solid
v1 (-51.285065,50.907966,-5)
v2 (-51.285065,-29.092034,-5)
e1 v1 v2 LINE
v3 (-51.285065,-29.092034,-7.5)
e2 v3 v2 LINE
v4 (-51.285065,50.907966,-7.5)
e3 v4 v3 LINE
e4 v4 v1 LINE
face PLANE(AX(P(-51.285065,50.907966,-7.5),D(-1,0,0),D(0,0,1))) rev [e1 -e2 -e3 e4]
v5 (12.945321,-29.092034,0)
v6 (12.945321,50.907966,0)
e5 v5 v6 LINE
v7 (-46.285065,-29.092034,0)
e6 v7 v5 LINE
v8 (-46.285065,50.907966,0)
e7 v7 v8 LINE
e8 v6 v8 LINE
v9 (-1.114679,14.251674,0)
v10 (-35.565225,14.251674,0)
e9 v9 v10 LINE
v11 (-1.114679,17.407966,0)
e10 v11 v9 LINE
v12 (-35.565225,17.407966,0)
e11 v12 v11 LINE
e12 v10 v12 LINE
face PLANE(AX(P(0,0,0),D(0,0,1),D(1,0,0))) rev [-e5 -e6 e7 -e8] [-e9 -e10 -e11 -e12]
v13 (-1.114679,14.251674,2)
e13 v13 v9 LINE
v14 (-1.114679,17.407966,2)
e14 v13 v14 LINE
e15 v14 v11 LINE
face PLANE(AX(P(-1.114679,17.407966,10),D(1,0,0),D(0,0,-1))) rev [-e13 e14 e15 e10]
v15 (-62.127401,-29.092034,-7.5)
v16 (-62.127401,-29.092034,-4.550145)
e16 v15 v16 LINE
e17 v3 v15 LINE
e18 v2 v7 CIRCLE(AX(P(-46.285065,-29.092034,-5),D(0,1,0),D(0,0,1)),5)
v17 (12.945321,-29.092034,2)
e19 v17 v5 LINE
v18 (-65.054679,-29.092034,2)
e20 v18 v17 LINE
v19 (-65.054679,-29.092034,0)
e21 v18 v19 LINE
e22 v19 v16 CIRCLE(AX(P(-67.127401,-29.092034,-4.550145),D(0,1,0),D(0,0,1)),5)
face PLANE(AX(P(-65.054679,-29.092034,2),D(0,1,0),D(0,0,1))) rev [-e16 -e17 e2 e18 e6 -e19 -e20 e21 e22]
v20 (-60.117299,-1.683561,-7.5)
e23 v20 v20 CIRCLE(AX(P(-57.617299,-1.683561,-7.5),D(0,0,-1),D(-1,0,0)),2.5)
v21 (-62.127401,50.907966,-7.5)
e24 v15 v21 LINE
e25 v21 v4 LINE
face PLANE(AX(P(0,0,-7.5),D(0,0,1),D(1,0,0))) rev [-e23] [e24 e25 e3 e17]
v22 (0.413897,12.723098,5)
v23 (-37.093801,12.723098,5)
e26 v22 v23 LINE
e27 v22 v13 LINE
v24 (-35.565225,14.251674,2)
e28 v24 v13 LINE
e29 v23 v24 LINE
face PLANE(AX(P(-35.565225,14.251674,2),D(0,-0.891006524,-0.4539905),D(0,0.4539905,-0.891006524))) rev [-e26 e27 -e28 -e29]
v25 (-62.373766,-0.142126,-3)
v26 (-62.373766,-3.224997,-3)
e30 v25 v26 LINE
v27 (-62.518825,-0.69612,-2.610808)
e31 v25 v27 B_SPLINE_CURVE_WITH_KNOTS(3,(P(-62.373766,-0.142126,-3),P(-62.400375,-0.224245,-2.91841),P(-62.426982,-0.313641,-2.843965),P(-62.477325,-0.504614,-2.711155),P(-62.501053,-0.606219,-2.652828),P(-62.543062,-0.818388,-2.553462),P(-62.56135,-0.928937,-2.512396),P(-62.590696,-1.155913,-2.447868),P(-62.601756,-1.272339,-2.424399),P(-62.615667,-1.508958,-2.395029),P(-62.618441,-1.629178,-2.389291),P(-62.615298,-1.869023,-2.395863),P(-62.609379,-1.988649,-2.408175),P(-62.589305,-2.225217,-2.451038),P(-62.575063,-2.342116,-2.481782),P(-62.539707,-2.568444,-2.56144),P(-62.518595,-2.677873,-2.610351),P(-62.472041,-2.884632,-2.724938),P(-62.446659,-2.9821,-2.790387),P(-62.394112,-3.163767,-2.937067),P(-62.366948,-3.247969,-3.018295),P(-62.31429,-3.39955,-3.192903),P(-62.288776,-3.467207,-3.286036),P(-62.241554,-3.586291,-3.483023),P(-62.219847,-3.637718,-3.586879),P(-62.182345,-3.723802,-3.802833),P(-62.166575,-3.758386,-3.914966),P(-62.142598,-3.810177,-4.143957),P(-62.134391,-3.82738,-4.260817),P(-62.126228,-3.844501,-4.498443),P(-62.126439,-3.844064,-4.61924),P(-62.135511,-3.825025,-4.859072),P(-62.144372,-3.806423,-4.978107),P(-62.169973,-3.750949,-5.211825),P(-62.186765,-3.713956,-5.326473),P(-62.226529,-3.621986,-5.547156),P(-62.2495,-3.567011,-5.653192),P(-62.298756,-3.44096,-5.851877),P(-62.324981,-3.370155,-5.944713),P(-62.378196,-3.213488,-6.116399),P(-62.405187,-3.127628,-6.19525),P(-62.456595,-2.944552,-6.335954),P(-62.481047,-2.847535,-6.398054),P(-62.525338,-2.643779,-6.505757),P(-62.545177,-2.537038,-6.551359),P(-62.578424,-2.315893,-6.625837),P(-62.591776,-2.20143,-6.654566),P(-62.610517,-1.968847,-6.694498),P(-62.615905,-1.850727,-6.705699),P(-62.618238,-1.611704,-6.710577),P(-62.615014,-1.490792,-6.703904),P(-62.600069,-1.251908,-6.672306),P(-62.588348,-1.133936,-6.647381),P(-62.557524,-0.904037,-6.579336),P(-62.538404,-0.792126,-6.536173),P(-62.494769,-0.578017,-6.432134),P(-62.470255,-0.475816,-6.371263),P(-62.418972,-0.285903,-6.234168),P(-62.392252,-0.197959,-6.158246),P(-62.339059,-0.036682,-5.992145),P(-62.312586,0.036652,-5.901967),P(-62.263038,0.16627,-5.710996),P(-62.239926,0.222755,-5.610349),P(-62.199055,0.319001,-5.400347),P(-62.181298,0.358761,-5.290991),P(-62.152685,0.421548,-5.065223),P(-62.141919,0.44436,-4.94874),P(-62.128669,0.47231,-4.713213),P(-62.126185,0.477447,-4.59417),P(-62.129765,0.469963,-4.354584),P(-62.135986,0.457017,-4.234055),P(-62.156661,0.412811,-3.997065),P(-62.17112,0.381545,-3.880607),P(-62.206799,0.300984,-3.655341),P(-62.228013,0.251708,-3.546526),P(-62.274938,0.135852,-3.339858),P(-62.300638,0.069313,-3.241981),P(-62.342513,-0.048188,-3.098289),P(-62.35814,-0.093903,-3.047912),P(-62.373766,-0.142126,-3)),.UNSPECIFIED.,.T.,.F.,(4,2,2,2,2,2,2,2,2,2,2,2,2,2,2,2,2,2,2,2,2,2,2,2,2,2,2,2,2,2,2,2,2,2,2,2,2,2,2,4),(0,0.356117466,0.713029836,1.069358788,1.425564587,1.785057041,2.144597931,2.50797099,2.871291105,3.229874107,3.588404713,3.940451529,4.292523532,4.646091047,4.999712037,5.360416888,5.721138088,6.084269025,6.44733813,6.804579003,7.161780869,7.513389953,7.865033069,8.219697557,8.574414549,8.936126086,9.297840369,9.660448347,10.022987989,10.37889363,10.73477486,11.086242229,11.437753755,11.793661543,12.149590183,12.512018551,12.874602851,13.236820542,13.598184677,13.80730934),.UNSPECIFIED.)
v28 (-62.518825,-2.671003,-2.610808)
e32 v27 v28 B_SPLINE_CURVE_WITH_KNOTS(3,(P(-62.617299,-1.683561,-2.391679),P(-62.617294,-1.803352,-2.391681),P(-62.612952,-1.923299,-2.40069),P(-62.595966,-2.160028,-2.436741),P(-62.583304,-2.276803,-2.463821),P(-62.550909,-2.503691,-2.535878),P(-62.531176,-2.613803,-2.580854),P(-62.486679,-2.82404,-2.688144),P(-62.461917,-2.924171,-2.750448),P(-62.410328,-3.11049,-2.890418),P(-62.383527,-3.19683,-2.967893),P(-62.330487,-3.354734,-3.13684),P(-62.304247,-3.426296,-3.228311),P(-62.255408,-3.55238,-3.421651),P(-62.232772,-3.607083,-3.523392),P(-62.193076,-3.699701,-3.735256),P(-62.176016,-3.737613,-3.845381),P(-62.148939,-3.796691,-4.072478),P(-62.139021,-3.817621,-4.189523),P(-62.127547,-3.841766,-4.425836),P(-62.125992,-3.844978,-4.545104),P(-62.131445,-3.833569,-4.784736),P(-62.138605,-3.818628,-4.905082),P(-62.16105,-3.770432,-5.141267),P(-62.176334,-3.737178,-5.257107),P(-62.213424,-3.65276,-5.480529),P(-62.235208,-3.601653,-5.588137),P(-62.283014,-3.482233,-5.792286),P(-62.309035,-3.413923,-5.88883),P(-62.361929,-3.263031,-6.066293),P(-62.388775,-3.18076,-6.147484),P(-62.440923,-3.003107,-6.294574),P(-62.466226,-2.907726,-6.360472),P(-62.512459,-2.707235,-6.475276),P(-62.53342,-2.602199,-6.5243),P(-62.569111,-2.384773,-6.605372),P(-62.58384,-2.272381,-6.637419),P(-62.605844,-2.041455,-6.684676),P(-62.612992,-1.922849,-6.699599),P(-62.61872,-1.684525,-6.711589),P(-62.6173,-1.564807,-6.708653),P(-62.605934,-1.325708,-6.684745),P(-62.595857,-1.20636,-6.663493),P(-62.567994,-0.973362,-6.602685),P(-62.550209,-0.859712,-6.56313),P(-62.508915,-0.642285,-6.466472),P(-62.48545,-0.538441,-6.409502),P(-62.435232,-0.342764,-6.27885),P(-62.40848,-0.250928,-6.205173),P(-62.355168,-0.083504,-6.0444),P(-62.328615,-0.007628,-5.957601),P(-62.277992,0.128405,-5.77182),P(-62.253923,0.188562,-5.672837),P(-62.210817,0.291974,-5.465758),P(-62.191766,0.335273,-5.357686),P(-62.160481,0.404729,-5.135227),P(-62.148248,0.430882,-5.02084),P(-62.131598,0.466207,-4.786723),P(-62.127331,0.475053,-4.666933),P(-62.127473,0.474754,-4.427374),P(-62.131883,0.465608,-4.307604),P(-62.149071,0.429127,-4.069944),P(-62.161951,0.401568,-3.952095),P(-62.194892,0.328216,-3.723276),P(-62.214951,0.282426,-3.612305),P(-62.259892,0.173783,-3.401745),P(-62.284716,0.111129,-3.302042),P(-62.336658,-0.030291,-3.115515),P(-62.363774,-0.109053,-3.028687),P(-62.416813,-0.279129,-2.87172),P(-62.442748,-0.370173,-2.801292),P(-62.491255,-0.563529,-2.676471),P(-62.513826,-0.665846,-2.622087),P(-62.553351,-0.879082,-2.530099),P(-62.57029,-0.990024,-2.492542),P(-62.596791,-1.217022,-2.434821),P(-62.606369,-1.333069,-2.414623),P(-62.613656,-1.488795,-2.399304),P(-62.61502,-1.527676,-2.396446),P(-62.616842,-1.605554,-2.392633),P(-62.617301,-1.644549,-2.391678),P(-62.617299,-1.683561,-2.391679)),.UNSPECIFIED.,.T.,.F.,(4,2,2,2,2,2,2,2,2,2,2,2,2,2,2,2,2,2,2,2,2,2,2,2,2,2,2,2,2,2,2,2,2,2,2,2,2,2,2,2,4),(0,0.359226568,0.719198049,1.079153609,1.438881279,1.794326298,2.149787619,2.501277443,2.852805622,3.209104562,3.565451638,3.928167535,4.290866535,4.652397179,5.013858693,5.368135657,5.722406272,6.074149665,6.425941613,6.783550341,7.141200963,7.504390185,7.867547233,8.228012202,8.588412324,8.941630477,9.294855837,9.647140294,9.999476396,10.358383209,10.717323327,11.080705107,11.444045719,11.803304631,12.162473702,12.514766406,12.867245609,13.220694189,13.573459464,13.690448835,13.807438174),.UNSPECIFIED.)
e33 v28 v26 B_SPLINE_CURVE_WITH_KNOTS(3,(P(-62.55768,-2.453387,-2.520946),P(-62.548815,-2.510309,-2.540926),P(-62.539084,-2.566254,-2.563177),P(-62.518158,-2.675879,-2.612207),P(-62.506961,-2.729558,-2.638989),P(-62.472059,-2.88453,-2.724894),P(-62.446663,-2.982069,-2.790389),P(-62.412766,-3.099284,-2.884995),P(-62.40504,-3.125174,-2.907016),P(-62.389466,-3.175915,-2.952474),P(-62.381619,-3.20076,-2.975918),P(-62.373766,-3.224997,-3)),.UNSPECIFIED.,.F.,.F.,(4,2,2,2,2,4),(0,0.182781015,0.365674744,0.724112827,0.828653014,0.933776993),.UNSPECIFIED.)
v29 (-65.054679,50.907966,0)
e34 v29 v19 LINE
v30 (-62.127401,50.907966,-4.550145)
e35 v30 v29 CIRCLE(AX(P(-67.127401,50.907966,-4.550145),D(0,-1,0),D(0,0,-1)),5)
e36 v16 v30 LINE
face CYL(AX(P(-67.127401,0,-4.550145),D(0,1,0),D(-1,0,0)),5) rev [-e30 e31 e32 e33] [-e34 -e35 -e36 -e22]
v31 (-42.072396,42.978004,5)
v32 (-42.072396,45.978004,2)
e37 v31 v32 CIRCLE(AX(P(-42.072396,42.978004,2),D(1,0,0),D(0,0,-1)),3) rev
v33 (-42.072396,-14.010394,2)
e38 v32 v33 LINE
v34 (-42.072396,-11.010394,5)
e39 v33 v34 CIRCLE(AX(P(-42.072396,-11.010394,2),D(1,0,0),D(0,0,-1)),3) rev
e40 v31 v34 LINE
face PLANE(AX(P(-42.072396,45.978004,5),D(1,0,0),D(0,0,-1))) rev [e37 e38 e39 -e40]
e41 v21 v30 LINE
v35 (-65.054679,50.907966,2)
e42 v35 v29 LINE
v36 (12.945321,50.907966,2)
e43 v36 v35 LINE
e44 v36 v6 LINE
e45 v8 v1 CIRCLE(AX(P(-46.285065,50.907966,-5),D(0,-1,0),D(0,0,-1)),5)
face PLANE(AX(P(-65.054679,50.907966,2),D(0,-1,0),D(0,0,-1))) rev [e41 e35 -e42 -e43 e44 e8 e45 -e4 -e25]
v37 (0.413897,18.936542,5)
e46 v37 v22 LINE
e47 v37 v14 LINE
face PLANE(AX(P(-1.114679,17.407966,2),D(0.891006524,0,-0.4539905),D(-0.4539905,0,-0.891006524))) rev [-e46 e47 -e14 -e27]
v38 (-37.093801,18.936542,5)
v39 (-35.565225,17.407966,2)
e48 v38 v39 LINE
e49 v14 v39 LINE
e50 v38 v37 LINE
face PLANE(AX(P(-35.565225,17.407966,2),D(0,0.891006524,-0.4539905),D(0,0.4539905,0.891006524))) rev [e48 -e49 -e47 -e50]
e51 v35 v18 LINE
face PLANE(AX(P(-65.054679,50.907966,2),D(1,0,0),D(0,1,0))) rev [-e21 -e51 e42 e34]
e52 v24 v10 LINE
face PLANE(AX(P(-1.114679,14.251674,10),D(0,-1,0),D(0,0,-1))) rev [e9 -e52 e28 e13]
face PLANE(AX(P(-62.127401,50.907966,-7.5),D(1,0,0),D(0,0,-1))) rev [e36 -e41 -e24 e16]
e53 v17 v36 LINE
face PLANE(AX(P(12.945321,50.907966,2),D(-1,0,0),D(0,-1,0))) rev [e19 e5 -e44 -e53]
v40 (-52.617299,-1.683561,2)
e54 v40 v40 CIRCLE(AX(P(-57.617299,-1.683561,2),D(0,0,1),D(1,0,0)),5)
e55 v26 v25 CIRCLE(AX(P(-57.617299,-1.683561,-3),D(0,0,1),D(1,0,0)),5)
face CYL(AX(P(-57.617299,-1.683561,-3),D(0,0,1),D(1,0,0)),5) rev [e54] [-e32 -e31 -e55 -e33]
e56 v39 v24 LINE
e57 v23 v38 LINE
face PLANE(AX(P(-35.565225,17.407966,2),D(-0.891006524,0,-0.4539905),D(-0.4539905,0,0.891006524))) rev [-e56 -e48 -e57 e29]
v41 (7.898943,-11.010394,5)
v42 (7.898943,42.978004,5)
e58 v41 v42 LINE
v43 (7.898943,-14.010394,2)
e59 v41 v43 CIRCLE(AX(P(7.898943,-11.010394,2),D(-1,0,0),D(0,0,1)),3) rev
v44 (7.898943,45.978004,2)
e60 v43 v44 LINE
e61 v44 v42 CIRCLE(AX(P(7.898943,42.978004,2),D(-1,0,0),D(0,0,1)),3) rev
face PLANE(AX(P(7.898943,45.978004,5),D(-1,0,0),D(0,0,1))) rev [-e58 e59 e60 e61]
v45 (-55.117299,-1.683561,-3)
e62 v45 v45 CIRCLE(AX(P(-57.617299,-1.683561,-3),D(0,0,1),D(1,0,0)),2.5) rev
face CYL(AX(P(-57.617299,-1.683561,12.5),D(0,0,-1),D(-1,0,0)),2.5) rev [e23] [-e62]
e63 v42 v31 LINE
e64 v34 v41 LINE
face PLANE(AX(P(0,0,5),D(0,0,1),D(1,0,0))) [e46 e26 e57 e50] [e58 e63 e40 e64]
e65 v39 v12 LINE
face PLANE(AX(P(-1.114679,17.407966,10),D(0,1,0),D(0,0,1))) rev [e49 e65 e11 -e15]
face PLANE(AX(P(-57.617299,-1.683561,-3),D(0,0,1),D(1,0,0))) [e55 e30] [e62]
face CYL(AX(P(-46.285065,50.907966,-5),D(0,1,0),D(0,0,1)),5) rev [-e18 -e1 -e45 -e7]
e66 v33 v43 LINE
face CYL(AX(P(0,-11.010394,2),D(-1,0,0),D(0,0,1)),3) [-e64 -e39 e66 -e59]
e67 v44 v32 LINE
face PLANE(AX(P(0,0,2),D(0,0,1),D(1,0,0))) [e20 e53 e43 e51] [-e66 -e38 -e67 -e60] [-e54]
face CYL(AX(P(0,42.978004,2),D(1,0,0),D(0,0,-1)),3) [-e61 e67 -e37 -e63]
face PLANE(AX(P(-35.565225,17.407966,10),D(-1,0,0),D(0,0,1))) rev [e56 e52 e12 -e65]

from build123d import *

# Parameters (mm, degrees)
SKETCH1_W           = 78
SKETCH1_H           = 80
BOSS_EXTRUDE1_DEPTH = 2
SKETCH2_W           = 34.450546123
SKETCH2_H           = 3.156291742
CUT_EXTRUDE1_DEPTH  = 10
SKETCH3_W           = 10.842335807
SKETCH3_H           = 80
BOSS_EXTRUDE2_DEPTH = 7.5
SKETCH4_R           = 2.5
CUT_EXTRUDE2_DEPTH  = 20
SKETCH5_R           = 5
CUT_EXTRUDE3_DEPTH  = 5
FILLET1_R           = 5
SKETCH8_W           = 49.971339188
SKETCH8_H           = 59.988397901
BOSS_EXTRUDE3_DEPTH = 3
FILLET3_R           = 3
SKETCH9_W           = 34.450546123
SKETCH9_H           = 3.156291742
CUT_EXTRUDE4_DEPTH  = 3
CUT_EXTRUDE4_DRAFT  = 27


# Some blends are built 0.0001 mm under size
with BuildPart() as part:
    # Sketch1 → Boss-Extrude1 (new body)
    with BuildSketch(Plane.XY):
        with Locations((-26.054678924, 10.907965965)):
            Rectangle(SKETCH1_W, SKETCH1_H)
    extrude(amount=BOSS_EXTRUDE1_DEPTH)

    # Sketch2 → Cut-Extrude1 (cut)
    with BuildSketch(Plane(origin=(0, 0, 0), x_dir=(-1, 0, 0), z_dir=(0, 0, -1))):
        with Locations((18.339951986, 15.829820094)):
            Rectangle(SKETCH2_W, SKETCH2_H)
    extrude(amount=-CUT_EXTRUDE1_DEPTH, mode=Mode.SUBTRACT)

    # Sketch3 → Boss-Extrude2 (add)
    with BuildSketch(Plane(origin=(0, 0, 0), x_dir=(-1, 0, 0), z_dir=(0, 0, -1))):
        with Locations((56.706233252, 10.907965965)):
            Rectangle(SKETCH3_W, SKETCH3_H)
    extrude(amount=BOSS_EXTRUDE2_DEPTH)

    # Sketch4 → Cut-Extrude2 (cut)
    with BuildSketch(Plane(origin=(0, 0, -7.5), x_dir=(-1, 0, 0), z_dir=(0, 0, -1))):
        with Locations((57.617298924, -1.683561388)):
            Circle(SKETCH4_R)
    extrude(amount=-CUT_EXTRUDE2_DEPTH, mode=Mode.SUBTRACT)

    # Sketch5 → Cut-Extrude3 (cut)
    with BuildSketch(Plane.XY.offset(2)):
        with Locations((-57.617298924, -1.683561388)):
            Circle(SKETCH5_R)
    extrude(amount=-CUT_EXTRUDE3_DEPTH, mode=Mode.SUBTRACT)

    # Fillet1
    # the kernel refuses this fillet: 5 mm, written as the material it adds along each edge
    with BuildSketch(Plane(origin=(-51.285065348, 50.907965965, 0), x_dir=(1, 0, 0), z_dir=(0, -1, 0))) as fillet1_piece_1:
        with BuildLine():
            CenterArc((FILLET1_R, -FILLET1_R), FILLET1_R, 90, 90)
            Line((0, -FILLET1_R), (0, 0))
            Line((0, 0), (FILLET1_R, 0))
        make_face()
    extrude(amount=80)
    # the kernel refuses this fillet: 5 mm, written as the material it adds along each edge
    with BuildSketch(Plane(origin=(-62.127401155, -29.092034035, 0), x_dir=(0, 0, -1), z_dir=(0, 1, 0))) as fillet1_2_piece_1_section:
        with BuildLine():
            CenterArc((4.550145333, 5), FILLET1_R, 204.490631369, 65.509368631)
            Line((0, 2.927277769), (0, 0))
            Line((0, 0), (4.550145333, 0))
        make_face()
    fillet1_2_piece_1 = extrude(amount=36.625369426, mode=Mode.PRIVATE)
    fillet1_2_piece_1 = split(fillet1_2_piece_1, bisect_by=Plane(origin=(-62.127401155, -29.092034035, -3), z_dir=(0, 0, -1)), keep=Keep.TOP, mode=Mode.PRIVATE)
    add(fillet1_2_piece_1)
    with BuildSketch(Plane(origin=(-62.127401155, -29.092034035, 0), x_dir=(0, 0, -1), z_dir=(0, 1, 0))) as fillet1_2_piece_2_section:
        with BuildLine():
            CenterArc((4.550145333, 5), FILLET1_R, 204.490631369, 65.509368631)
            Line((0, 2.927277769), (0, 0))
            Line((0, 0), (4.550145333, 0))
        make_face()
    fillet1_2_piece_2 = extrude(amount=36.625369426, mode=Mode.PRIVATE)
    fillet1_2_piece_2 = fillet1_2_piece_2 - Plane(origin=(-57.617298924, -1.683561388, 0), x_dir=(1, 0, 0), z_dir=(0, 0, 1)) * Cylinder(5, 92, mode=Mode.PRIVATE)
    add(fillet1_2_piece_2)
    # the kernel refuses this fillet: 5 mm, written as the material it adds along each edge
    with BuildSketch(Plane(origin=(-62.127401155, 7.533335391, 0), x_dir=(-1, 0, 0), z_dir=(0, 1, 0))) as fillet1_3_piece_1:
        with BuildLine():
            CenterArc((5, -4.550145333), FILLET1_R, 114.490631369, 65.509368631)
            Line((0, -4.550145333), (0, 0))
            Line((0, 0), (2.927277769, 0))
        make_face()
    extrude(amount=43.374630574)
    # the kernel refuses this fillet: 5 mm, written as the material it takes off along each edge

    # Sketch8 → Boss-Extrude3 (add)
    with BuildSketch(Plane.XY.offset(2)):
        with Locations((-17.086726302, 15.98380471)):
            Rectangle(SKETCH8_W, SKETCH8_H)
    extrude(amount=BOSS_EXTRUDE3_DEPTH)

    # Fillet3
    fillet3_edges = [part.edges().sort_by_distance(p)[0] for p in [
        (-17.086726302, -14.010394241, 5),
        (-17.086726302, 45.97800366, 5),
    ]]
    fillet(fillet3_edges, radius=FILLET3_R - 0.0001)  # a hair under: the kernel refuses the full size


with BuildPart() as cut_extrude4_tool:
    # Sketch9 → Cut-Extrude4 (with draft: the straight prism first)
    with BuildSketch(Plane(origin=(0, 0, 2), x_dir=(-1, 0, 0), z_dir=(0, 0, -1))):
        with Locations((18.339951986, 15.829820094)):
            Rectangle(SKETCH9_W, SKETCH9_H)
    extrude(amount=-CUT_EXTRUDE4_DEPTH)
    # Cut-Extrude4: the draft: its side faces are tilted about the plane it starts from
    cut_extrude4_sides = [cut_extrude4_tool.faces().sort_by_distance(p)[0] for p in [
        (-18.339951986, 17.407965965, 3.5),
        (-1.114678924, 15.829820094, 3.5),
        (-18.339951986, 14.251674223, 3.5),
        (-35.565225047, 15.829820094, 3.5),
    ]]
    draft(cut_extrude4_sides, Plane(origin=(0, 0, 2), x_dir=(-1, 0, 0), z_dir=(0, 0, -1)), CUT_EXTRUDE4_DRAFT)


with BuildPart() as part_1:
    add(part.part)

    # Cut-Extrude4: cut by cut_extrude4_tool
    add(cut_extrude4_tool.part, mode=Mode.SUBTRACT)


solid = part_1.part
